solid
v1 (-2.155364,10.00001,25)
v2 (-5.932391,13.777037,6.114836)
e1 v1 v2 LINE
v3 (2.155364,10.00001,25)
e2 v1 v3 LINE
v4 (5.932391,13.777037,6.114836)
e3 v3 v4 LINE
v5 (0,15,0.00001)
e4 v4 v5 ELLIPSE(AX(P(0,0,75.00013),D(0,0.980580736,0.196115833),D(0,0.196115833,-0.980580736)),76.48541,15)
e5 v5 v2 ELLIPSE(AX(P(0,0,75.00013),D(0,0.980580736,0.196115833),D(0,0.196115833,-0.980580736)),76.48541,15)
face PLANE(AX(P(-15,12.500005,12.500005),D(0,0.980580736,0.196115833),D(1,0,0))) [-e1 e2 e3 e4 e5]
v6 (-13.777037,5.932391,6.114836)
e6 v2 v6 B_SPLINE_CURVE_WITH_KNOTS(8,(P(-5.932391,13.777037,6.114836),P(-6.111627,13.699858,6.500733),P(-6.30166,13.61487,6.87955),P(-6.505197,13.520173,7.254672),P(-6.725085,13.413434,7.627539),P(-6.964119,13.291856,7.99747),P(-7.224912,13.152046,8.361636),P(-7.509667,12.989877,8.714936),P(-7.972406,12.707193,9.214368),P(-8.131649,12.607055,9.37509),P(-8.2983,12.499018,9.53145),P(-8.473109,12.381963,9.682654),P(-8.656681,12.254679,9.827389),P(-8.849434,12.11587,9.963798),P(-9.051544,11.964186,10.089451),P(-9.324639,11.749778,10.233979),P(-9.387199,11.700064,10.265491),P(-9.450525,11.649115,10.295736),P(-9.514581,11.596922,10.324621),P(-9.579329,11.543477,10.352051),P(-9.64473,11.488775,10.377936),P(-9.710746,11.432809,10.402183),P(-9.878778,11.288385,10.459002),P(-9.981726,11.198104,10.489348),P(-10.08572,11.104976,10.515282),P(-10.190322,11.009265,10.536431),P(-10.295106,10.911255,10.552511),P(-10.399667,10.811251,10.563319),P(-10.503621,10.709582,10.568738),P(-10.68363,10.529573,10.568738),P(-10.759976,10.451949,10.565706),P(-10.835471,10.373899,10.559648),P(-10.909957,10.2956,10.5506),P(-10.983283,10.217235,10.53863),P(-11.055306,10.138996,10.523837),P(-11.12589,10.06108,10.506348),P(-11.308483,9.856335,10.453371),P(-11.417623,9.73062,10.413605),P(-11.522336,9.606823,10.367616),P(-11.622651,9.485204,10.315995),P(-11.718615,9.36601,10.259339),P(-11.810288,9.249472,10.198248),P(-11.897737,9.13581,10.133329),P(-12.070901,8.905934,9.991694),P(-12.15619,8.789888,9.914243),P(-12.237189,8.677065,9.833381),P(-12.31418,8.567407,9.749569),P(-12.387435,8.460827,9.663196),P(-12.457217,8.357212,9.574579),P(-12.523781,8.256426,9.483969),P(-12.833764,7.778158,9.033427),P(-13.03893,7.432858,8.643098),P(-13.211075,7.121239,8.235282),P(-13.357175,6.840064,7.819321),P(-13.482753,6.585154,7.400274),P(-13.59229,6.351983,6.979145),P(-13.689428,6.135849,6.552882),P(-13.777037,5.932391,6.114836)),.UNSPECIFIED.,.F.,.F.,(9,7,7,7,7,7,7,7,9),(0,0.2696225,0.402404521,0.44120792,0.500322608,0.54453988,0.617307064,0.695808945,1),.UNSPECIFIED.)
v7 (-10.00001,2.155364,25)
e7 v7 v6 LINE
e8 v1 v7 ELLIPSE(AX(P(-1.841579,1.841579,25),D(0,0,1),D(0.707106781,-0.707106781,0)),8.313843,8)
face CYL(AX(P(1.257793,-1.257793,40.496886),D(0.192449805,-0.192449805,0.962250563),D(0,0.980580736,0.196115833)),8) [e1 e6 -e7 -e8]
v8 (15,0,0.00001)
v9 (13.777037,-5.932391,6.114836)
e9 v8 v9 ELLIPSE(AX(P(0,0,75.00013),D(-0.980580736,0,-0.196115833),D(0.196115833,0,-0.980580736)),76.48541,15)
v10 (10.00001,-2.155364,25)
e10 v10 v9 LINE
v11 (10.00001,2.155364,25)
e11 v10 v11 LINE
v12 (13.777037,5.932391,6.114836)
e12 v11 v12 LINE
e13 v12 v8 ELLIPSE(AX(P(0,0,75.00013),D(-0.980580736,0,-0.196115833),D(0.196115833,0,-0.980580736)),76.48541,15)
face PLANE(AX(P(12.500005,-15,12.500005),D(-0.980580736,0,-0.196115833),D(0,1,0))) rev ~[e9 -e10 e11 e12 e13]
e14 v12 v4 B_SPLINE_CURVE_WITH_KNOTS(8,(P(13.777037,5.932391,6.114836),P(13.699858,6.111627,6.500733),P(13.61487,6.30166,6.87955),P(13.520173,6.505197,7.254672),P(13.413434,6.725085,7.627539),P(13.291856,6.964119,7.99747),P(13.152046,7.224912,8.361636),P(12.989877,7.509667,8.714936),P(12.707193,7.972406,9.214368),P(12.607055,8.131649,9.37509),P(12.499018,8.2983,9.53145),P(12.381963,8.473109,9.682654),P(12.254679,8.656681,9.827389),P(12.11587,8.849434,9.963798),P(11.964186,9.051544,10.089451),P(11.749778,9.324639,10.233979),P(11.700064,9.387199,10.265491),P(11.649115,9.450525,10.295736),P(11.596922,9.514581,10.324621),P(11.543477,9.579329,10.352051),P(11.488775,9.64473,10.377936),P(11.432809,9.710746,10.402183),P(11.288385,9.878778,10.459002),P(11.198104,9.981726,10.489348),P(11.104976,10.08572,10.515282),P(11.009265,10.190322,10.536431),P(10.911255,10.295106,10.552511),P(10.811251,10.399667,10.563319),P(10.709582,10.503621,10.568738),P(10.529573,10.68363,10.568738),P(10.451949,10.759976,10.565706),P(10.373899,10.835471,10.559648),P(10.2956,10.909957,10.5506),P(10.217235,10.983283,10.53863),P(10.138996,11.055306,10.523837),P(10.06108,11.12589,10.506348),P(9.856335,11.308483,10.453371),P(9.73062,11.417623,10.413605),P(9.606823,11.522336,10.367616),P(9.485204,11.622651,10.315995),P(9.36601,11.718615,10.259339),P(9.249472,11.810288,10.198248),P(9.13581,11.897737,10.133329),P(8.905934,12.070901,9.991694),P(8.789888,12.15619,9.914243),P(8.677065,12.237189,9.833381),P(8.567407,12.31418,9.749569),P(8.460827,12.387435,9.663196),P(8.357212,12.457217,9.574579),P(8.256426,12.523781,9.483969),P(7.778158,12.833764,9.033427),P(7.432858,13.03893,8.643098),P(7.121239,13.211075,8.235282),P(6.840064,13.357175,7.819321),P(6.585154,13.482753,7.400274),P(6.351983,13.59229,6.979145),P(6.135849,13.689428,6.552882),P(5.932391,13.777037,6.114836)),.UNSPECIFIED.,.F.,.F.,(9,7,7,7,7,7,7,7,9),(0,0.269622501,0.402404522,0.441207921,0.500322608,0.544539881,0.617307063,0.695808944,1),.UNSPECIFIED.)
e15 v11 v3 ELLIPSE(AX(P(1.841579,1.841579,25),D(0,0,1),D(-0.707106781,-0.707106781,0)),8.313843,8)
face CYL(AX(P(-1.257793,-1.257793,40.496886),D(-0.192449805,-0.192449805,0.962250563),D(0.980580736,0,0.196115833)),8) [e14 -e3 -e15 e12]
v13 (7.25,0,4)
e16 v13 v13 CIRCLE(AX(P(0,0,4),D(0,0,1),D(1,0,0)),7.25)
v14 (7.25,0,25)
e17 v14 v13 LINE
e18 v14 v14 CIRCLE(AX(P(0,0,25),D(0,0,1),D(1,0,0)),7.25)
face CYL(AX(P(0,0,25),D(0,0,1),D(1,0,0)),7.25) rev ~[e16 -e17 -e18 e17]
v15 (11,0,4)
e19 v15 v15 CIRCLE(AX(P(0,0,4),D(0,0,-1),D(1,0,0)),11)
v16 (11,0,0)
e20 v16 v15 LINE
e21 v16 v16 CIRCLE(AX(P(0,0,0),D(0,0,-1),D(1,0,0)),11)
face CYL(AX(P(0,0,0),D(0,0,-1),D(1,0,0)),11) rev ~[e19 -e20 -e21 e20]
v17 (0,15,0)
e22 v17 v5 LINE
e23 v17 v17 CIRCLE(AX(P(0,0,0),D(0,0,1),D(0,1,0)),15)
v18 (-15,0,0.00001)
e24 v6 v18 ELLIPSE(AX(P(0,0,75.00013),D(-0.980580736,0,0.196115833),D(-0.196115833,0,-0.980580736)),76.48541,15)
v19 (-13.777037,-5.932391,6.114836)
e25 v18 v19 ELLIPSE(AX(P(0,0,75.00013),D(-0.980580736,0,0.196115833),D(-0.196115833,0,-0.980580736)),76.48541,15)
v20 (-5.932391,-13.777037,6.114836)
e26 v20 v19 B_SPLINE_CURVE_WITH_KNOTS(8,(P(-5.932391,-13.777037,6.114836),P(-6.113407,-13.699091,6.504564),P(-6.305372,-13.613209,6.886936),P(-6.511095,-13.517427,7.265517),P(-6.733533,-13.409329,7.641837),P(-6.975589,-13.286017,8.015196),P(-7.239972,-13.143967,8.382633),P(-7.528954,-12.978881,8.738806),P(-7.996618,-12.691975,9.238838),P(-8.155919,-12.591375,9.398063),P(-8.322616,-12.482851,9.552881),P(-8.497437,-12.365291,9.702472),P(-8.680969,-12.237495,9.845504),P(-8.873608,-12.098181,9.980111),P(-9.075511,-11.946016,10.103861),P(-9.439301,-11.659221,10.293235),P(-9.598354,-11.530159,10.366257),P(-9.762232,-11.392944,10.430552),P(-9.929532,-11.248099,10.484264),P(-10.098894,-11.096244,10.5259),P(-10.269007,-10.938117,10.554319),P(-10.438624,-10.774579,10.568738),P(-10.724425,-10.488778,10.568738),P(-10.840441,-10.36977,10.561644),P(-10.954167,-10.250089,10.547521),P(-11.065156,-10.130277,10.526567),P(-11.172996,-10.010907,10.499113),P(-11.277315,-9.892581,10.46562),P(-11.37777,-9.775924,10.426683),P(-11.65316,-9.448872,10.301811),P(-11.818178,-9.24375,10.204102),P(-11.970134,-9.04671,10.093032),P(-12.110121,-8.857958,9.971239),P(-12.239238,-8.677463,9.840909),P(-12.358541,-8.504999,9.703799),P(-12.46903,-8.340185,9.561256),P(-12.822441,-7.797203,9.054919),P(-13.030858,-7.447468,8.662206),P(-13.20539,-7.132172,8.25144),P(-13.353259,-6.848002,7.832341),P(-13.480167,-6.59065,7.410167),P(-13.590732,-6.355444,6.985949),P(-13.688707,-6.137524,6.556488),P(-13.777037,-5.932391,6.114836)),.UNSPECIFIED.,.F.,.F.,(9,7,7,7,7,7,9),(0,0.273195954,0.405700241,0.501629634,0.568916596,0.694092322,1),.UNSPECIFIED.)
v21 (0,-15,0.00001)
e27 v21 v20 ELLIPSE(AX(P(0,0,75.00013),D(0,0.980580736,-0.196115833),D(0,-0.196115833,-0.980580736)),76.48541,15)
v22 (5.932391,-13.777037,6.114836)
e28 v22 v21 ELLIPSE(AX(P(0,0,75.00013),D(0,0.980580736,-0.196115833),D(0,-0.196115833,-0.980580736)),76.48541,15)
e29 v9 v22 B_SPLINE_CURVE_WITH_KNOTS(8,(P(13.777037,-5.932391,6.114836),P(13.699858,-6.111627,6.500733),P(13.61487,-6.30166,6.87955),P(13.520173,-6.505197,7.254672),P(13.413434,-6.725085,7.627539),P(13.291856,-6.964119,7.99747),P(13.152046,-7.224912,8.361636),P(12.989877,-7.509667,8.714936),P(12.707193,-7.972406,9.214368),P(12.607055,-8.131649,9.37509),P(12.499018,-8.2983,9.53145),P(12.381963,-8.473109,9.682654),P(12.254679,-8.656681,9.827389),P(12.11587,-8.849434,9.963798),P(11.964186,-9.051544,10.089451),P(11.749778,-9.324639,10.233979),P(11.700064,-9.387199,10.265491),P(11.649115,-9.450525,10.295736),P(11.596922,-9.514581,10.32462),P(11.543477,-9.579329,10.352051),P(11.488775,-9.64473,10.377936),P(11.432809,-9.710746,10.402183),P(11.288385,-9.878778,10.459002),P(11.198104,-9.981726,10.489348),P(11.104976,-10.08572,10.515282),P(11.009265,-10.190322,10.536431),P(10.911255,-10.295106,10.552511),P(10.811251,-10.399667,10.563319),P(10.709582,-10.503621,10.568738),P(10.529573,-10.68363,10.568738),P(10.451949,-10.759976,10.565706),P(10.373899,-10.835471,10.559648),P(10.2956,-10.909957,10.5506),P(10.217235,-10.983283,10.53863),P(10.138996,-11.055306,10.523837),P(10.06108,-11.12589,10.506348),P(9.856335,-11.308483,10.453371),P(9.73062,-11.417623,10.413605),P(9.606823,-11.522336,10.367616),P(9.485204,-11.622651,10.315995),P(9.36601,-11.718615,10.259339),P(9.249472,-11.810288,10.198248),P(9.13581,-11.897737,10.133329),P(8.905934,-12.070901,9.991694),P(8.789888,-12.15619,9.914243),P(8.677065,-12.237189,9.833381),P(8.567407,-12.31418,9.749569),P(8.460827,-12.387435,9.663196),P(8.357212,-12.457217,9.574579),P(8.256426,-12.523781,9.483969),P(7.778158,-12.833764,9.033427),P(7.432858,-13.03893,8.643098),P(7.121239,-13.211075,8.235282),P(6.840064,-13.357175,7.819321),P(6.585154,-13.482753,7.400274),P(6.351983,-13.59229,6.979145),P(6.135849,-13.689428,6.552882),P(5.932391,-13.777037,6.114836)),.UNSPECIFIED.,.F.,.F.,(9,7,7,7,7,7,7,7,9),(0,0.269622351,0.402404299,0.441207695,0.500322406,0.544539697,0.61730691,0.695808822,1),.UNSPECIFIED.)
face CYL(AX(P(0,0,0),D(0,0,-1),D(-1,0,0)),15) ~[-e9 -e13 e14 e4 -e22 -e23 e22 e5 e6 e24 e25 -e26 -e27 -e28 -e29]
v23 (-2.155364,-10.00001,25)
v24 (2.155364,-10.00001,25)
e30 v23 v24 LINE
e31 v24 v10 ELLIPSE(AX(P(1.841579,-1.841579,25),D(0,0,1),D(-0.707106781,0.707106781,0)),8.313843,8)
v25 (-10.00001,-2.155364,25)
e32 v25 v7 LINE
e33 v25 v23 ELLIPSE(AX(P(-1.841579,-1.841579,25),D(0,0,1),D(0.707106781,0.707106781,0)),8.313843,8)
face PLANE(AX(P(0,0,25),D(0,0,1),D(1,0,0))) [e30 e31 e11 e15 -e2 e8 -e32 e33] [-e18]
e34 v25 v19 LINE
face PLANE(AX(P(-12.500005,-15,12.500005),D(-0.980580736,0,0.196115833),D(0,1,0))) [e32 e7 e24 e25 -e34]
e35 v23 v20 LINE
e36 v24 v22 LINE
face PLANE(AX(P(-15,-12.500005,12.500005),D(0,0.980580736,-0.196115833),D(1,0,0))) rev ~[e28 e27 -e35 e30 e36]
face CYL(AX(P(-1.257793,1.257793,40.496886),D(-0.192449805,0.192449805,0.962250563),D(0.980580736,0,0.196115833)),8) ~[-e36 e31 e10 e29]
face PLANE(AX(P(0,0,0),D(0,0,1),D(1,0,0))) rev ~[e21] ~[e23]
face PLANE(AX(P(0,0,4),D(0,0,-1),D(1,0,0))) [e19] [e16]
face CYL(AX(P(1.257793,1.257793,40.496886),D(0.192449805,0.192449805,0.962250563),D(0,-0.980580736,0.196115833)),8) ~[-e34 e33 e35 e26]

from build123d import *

# Parameters (mm, degrees)
F0_W        = 30
F0_H        = 30
F1_DEPTH    = 25
F2_R        = 7.25
F3_DEPTH    = 25
F4_SIZE2    = 24.99999
F4_SIZE     = 4.99999
F5_T1_DEPTH = 102.9607936575
F5_T3_DEPTH = 102.9607936575
F5_T5_DEPTH = 102.9607936575
F5_T7_DEPTH = 102.9607936575
F7_DEPTH    = 25
F8_R        = 11
F9_DEPTH    = 4


# Not quite as in the source:
# - a fillet or chamfer that OpenCascade refuses, or shapes differently, is made with other operations: its cross-section is extruded or revolved along the edge and cut away or added
# - a fillet or chamfer is up to 0.001 mm smaller than in the source, because OpenCascade refuses the exact size


with BuildPart() as f1:
    # F0 (on Top) → F1 (new body)
    with BuildSketch(Plane.XY):
        Rectangle(F0_W, F0_H)
    extrude(amount=F1_DEPTH)

    # F2 (on face) → F3 (cut)
    with BuildSketch(Plane.XY.offset(25)):
        Circle(F2_R)
    extrude(amount=-F3_DEPTH, mode=Mode.SUBTRACT)

    # F4 (size 5 and 25 in the source; OpenCascade refuses exactly that, so slightly less here)
    f4_edges = [f1.edges().sort_by_distance(p)[0] for p in [
        (15, 0, 25),
        (0, 15, 25),
        (-15, 0, 25),
        (0, -15, 25),
    ]]
    f4_side = f1.faces().sort_by_distance((14.575736, 0, 25))[0]
    chamfer(f4_edges, length=F4_SIZE, length2=F4_SIZE2, reference=f4_side)

    # F5: fillet of radius 8 on 4 edges, made by hand

    # F5_s2 → F5_t1 (cut)
    with BuildSketch(Plane(origin=(-7.5925826886, 7.5925826886, 37.9629741838), x_dir=(0.7071067812, 0.7071067812, 0), z_dir=(0.1924498046, -0.1924498046, -0.9622505627))):
        with BuildLine():
            ThreePointArc((5.5470023036, 15.0748135762), (0, 17.3102003677), (-5.5470023036, 15.0748135762))
            Line((-5.5470023036, 15.0748135762), (0, 20.4124196641))
            Line((0, 20.4124196641), (5.5470023036, 15.0748135762))
        make_face()
    extrude(amount=F5_T1_DEPTH, mode=Mode.SUBTRACT)

    # F5_s4 → F5_t3 (cut)
    with BuildSketch(Plane(origin=(-7.5925826886, -7.5925826886, 37.9629741838), x_dir=(-0.7071067812, 0.7071067812, 0), z_dir=(0.1924498046, 0.1924498046, -0.9622505627))):
        with BuildLine():
            ThreePointArc((-5.5470023036, 15.0748135762), (0, 17.3102003677), (5.5470023036, 15.0748135762))
            Line((5.5470023036, 15.0748135762), (0, 20.4124196641))
            Line((0, 20.4124196641), (-5.5470023036, 15.0748135762))
        make_face()
    extrude(amount=F5_T3_DEPTH, mode=Mode.SUBTRACT)

    # F5_s6 → F5_t5 (cut)
    with BuildSketch(Plane(origin=(7.5925826886, -7.5925826886, 37.9629741838), x_dir=(-0.7071067812, -0.7071067812, 0), z_dir=(-0.1924498046, 0.1924498046, -0.9622505627))):
        with BuildLine():
            ThreePointArc((-5.5470023036, 15.0748135762), (0, 17.3102003677), (5.5470023036, 15.0748135762))
            Line((5.5470023036, 15.0748135762), (0, 20.4124196641))
            Line((0, 20.4124196641), (-5.5470023036, 15.0748135762))
        make_face()
    extrude(amount=F5_T5_DEPTH, mode=Mode.SUBTRACT)

    # F5_s8 → F5_t7 (cut)
    with BuildSketch(Plane(origin=(7.5925826886, 7.5925826886, 37.9629741838), x_dir=(0.7071067812, -0.7071067812, 0), z_dir=(-0.1924498046, -0.1924498046, -0.9622505627))):
        with BuildLine():
            ThreePointArc((5.5470023036, 15.0748135762), (0, 17.3102003677), (-5.5470023036, 15.0748135762))
            Line((-5.5470023036, 15.0748135762), (0, 20.4124196641))
            Line((0, 20.4124196641), (5.5470023036, 15.0748135762))
        make_face()
    extrude(amount=F5_T7_DEPTH, mode=Mode.SUBTRACT)

    # F6 (on face) → F7 (cut)
    with BuildSketch(Plane(origin=(0, 0, 0), x_dir=(1, 0, 0), z_dir=(0, 0, -1))):
        with BuildLine():
            ThreePointArc((0, 15), (10.6066017178, 10.6066017178), (15, 0))
            Line((15, 0), (15, 7.1610644072))
            add(Edge.make_bspline(
                [(7.1610644072, 15), (14.9945107468, 14.9945107468), (15, 7.1610644072)],
                knots=[2.3761301528, 2.3761301528, 2.3761301528, 3.9070551544, 3.9070551544, 3.9070551544], degree=2, weights=[1, 0.7210619814, 1]))
            Line((7.1610644072, 15), (0, 15))
        make_face()
        with BuildLine():
            ThreePointArc((-15, 0), (-10.6066017178, 10.6066017178), (0, 15))
            Line((0, 15), (-7.1610644072, 15))
            add(Edge.make_bspline(
                [(-15, 7.1610644072), (-14.9945107468, 14.9945107468), (-7.1610644072, 15)],
                knots=[2.3761301528, 2.3761301528, 2.3761301528, 3.9070551544, 3.9070551544, 3.9070551544], degree=2, weights=[1, 0.7210619814, 1]))
            Line((-15, 7.1610644072), (-15, 0))
        make_face()
        with BuildLine():
            Line((-7.1610644072, -15), (0, -15))
            ThreePointArc((0, -15), (-10.6066017178, -10.6066017178), (-15, 0))
            Line((-15, 0), (-15, -7.1610644072))
            add(Edge.make_bspline(
                [(-7.1610644072, -15), (-14.9945107468, -14.9945107468), (-15, -7.1610644072)],
                knots=[2.3761301528, 2.3761301528, 2.3761301528, 3.9070551544, 3.9070551544, 3.9070551544], degree=2, weights=[1, 0.7210619814, 1]))
        make_face()
        with BuildLine():
            Line((15, -7.1610644072), (15, 0))
            ThreePointArc((15, 0), (10.6066017178, -10.6066017178), (0, -15))
            Line((0, -15), (7.1610644072, -15))
            add(Edge.make_bspline(
                [(15, -7.1610644072), (14.9945107468, -14.9945107468), (7.1610644072, -15)],
                knots=[2.3761301528, 2.3761301528, 2.3761301528, 3.9070551544, 3.9070551544, 3.9070551544], degree=2, weights=[1, 0.7210619814, 1]))
        make_face()
    extrude(amount=-F7_DEPTH, mode=Mode.SUBTRACT)

    # F8 (on face) → F9 (cut)
    with BuildSketch(Plane(origin=(0, 0, 0), x_dir=(1, 0, 0), z_dir=(0, 0, -1))):
        Circle(F8_R)
    extrude(amount=-F9_DEPTH, mode=Mode.SUBTRACT)


solid = f1.part
